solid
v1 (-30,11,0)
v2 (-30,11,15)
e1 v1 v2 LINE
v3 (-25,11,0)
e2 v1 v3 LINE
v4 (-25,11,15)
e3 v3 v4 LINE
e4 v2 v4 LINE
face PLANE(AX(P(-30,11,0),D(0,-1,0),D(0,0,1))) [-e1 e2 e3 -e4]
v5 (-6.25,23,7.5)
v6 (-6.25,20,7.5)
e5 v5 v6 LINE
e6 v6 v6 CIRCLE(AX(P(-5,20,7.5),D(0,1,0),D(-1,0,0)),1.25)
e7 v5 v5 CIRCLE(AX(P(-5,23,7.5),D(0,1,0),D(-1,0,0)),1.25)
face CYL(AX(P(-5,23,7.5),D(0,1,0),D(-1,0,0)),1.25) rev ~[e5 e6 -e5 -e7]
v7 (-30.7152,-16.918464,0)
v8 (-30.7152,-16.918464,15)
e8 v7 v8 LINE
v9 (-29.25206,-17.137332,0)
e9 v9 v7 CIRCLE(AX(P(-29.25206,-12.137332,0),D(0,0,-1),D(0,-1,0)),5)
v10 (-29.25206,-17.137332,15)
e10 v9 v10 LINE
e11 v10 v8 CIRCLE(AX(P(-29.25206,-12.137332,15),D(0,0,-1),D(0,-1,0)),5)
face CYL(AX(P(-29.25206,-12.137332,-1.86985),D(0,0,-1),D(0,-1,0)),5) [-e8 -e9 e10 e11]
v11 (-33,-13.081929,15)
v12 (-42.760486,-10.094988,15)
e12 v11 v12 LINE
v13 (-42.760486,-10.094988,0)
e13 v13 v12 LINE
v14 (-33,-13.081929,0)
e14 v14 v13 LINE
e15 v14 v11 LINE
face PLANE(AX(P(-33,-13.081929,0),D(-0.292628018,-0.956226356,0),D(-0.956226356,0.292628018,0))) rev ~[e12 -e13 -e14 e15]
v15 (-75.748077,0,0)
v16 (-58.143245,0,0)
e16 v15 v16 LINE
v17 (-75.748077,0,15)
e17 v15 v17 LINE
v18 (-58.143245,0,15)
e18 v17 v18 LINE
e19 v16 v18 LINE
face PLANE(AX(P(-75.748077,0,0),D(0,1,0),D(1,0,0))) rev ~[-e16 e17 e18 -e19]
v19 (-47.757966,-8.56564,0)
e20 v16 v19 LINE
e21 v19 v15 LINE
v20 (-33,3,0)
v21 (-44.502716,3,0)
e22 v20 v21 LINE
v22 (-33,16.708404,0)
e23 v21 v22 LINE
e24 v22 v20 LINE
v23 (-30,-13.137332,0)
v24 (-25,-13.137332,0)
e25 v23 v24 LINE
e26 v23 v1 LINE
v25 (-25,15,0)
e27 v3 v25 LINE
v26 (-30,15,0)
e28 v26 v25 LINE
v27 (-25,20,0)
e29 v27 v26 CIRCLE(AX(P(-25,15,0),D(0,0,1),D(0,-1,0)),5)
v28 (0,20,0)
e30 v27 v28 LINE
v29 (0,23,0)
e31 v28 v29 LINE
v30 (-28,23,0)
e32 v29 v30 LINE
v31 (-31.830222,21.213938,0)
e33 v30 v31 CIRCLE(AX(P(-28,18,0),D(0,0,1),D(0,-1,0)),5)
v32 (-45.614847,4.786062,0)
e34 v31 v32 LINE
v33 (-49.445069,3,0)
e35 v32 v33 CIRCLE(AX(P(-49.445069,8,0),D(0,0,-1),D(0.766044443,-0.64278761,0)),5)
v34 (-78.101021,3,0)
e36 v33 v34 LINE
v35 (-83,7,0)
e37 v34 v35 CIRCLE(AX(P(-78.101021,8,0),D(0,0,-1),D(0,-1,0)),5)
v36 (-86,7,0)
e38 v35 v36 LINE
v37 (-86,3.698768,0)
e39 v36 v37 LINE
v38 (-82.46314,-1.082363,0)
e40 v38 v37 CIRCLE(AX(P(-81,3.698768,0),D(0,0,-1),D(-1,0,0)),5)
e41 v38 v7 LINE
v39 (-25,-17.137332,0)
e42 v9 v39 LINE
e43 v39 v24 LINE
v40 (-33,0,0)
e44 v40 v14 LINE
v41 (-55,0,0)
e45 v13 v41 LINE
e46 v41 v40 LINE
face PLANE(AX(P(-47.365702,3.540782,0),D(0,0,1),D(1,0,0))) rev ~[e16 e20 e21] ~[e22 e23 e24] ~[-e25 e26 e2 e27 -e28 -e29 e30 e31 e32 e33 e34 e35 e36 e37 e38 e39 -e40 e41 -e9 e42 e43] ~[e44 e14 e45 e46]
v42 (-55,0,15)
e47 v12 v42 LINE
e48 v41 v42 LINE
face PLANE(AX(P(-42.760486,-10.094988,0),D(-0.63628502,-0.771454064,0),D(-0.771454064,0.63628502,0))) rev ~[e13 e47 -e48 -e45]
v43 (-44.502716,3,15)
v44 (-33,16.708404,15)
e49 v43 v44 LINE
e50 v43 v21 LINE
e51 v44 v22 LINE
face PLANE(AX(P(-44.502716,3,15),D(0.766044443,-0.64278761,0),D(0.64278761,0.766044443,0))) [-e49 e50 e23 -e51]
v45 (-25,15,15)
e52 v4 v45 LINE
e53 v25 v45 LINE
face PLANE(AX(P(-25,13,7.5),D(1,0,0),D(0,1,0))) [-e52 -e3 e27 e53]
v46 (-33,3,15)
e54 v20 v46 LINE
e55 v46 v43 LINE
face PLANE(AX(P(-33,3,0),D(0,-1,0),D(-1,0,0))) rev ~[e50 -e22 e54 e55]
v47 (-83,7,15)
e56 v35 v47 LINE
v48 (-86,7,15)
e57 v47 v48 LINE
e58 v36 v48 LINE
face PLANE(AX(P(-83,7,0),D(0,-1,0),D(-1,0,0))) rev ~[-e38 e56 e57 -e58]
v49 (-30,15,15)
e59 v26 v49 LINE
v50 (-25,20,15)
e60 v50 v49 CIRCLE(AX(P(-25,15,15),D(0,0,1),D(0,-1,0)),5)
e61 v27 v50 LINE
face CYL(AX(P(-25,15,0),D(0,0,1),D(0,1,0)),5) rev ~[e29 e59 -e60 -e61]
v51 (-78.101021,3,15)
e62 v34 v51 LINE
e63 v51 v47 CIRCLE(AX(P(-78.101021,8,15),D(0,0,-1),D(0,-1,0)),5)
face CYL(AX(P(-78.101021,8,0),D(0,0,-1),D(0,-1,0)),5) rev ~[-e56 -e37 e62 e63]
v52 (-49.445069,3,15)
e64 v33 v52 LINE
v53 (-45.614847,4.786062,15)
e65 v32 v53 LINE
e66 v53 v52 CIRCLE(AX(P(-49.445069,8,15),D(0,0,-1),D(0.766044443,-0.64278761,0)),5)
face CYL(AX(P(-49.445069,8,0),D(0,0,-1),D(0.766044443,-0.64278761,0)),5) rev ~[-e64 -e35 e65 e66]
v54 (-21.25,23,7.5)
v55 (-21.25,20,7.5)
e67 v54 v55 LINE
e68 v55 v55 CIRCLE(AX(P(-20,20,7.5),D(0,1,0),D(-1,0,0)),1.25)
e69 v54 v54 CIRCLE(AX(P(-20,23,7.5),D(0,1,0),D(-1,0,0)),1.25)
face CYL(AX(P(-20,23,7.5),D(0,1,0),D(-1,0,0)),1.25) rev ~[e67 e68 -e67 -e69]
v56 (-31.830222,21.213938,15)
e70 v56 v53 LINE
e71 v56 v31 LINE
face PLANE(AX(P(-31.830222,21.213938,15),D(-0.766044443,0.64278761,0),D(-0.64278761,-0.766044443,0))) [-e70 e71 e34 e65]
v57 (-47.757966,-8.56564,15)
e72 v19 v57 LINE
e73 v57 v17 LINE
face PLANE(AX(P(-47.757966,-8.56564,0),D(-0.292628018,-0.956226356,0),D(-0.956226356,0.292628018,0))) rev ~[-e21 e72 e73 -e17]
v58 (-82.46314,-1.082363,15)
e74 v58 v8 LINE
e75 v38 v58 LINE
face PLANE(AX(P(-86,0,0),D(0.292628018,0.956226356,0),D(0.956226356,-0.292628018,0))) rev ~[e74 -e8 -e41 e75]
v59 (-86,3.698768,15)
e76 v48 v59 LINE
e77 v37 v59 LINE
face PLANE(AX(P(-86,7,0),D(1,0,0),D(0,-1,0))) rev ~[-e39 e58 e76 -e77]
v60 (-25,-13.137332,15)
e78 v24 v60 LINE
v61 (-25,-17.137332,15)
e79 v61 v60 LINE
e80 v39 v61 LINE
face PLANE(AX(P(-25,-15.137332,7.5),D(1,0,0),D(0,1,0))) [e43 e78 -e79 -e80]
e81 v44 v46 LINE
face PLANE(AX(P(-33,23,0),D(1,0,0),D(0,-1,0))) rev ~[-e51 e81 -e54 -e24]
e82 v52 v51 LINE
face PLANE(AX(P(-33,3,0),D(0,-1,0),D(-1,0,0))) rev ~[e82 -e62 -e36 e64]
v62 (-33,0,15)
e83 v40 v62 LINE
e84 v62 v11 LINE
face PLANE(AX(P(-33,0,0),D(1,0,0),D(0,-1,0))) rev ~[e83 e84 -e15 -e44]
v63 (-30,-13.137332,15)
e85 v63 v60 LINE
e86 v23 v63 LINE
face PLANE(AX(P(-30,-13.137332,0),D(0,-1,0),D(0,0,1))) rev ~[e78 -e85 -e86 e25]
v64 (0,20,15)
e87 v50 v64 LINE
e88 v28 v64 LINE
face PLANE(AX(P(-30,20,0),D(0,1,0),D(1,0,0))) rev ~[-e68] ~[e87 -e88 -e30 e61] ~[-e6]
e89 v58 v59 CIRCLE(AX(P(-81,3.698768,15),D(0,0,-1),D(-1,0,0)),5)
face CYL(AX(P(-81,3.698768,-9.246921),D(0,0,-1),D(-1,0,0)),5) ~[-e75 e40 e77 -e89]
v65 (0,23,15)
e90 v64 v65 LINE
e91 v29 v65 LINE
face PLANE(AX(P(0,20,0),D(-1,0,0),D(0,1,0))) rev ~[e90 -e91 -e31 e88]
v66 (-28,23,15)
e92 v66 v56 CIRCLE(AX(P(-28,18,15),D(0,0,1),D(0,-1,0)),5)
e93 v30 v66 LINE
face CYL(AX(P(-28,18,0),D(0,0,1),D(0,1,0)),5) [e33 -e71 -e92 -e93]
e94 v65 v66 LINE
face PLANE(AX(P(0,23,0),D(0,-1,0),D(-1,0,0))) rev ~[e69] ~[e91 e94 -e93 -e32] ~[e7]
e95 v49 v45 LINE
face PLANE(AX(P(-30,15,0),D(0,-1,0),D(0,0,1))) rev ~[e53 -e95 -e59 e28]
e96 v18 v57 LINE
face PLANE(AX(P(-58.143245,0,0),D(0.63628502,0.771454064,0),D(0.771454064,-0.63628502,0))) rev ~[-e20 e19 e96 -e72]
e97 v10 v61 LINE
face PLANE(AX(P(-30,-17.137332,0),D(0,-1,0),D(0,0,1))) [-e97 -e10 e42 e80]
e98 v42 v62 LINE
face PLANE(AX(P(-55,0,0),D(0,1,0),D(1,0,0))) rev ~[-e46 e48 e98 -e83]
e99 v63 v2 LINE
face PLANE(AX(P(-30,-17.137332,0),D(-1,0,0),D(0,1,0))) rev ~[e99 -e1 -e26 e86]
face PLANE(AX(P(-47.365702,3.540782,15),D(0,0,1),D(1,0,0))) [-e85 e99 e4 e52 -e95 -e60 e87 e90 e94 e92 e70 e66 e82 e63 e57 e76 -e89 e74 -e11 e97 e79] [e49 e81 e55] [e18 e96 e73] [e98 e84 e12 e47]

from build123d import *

# Parameters (mm, degrees)
F1_DEPTH    = 15
F2_R        = 1.25
F3_DEPTH    = 40.1383324758
F4_R        = 5
F5_W        = 4
F5_H        = 15
F6_DEPTH    = 5
F8_DEPTH    = 15
F9_T1_DEPTH = 15
F9_T3_DEPTH = 15
F9_T5_DEPTH = 33.4938424429
F9_T7_DEPTH = 18.7397003757


# Not quite as in the source:
# - a fillet or chamfer that OpenCascade refuses, or shapes differently, is made with other operations: its cross-section is extruded or revolved along the edge and cut away or added


with BuildPart() as f1:
    # F0 (on Top) → F1 (new body)
    with BuildSketch(Plane.XY):
        Polygon((0, 20), (0, 23), (-33, 23), (-33, 3), (-83, 3), (-83, 7), (-86, 7), (-86, 0), (-30, -17.1373324758), (-30, -14), (-30, 0), (-30, 20), align=None)
        Polygon((-47.7579661467, -8.5656398223), (-75.7480766687, 0), (-58.1432454597, 0), align=None, mode=Mode.SUBTRACT)
        Polygon((-33, 0), (-33, -13.0819286174), (-42.760486377, -10.0949875429), (-55, 0), align=None, mode=Mode.SUBTRACT)
    extrude(amount=F1_DEPTH)

    # F2 (on face) → F3 (cut, through all)
    with BuildSketch(Plane(origin=(0, 23, 0), x_dir=(-1, 0, 0), z_dir=(0, 1, 0))):
        with Locations((5, 7.5)):
            Circle(F2_R)
        with Locations((20, 7.5)):
            Circle(F2_R)
    extrude(amount=-F3_DEPTH, mode=Mode.SUBTRACT)

    # F4
    f4_edges = [f1.edges().sort_by_distance(p)[0] for p in [
        (-33, 23, 7.5),
        (-30, 20, 7.5),
    ]]
    fillet(f4_edges, radius=F4_R)

    # F5 (on face) → F6 (join)
    with BuildSketch(Plane.YZ.offset(-30)):
        with Locations((-15.1373324758, 7.5)):
            Rectangle(F5_W, F5_H)
        with Locations((13, 7.5)):
            Rectangle(F5_W, F5_H)
    extrude(amount=F6_DEPTH)

    # F7 (on face) → F8 (join, through all)
    with BuildSketch(Plane.XY.offset(15)):
        with BuildLine():
            Line((-31.8302222156, 21.2139380484), (-47.1135309143, 3))
            Line((-47.1135309143, 3), (-44.5027163357, 3))
            Line((-44.5027163357, 3), (-33, 16.7084035176))
            Line((-33, 16.7084035176), (-33, 18))
            ThreePointArc((-33, 18), (-32.6984631039, 19.7101007166), (-31.8302222156, 21.2139380484))
        make_face()
    extrude(amount=-F8_DEPTH)

    # F9: fillet of radius 5 on 4 edges, made by hand

    # F9_s2 → F9_t1 (join)
    with BuildSketch(Plane.XY):
        with BuildLine():
            ThreePointArc((-78.1010205144, 3), (-81.2632981746, 4.1270166538), (-83, 7))
            Line((-83, 7), (-83, 3))
            Line((-83, 3), (-78.1010205144, 3))
        make_face()
    extrude(amount=F9_T1_DEPTH)

    # F9_s4 → F9_t3 (join)
    with BuildSketch(Plane.XY):
        with BuildLine():
            ThreePointArc((-45.6148469895, 4.7860619516), (-47.3319778964, 3.4684610648), (-49.4450692051, 3))
            Line((-49.4450692051, 3), (-47.1135309143, 3))
            Line((-47.1135309143, 3), (-45.6148469895, 4.7860619516))
        make_face()
    extrude(amount=F9_T3_DEPTH)

    # F9_s6 → F9_t5 (cut)
    with BuildSketch(Plane.XY.offset(-9.2469212215)):
        with BuildLine():
            ThreePointArc((-86, 3.6987684886), (-85.0196828505, 0.7251932363), (-82.4631400875, -1.08236329))
            Line((-82.4631400875, -1.08236329), (-86, 0))
            Line((-86, 0), (-86, 3.6987684886))
        make_face()
    extrude(amount=F9_T5_DEPTH, mode=Mode.SUBTRACT)

    # F9_s8 → F9_t7 (cut)
    with BuildSketch(Plane.XY.offset(-1.8698501879)):
        with BuildLine():
            ThreePointArc((-29.2520599249, -17.1373324758), (-29.9917697014, -17.0823127029), (-30.7152000124, -16.9184642544))
            Line((-30.7152000124, -16.9184642544), (-30, -17.1373324758))
            Line((-30, -17.1373324758), (-29.2520599249, -17.1373324758))
        make_face()
    extrude(amount=F9_T7_DEPTH, mode=Mode.SUBTRACT)


solid = f1.part
